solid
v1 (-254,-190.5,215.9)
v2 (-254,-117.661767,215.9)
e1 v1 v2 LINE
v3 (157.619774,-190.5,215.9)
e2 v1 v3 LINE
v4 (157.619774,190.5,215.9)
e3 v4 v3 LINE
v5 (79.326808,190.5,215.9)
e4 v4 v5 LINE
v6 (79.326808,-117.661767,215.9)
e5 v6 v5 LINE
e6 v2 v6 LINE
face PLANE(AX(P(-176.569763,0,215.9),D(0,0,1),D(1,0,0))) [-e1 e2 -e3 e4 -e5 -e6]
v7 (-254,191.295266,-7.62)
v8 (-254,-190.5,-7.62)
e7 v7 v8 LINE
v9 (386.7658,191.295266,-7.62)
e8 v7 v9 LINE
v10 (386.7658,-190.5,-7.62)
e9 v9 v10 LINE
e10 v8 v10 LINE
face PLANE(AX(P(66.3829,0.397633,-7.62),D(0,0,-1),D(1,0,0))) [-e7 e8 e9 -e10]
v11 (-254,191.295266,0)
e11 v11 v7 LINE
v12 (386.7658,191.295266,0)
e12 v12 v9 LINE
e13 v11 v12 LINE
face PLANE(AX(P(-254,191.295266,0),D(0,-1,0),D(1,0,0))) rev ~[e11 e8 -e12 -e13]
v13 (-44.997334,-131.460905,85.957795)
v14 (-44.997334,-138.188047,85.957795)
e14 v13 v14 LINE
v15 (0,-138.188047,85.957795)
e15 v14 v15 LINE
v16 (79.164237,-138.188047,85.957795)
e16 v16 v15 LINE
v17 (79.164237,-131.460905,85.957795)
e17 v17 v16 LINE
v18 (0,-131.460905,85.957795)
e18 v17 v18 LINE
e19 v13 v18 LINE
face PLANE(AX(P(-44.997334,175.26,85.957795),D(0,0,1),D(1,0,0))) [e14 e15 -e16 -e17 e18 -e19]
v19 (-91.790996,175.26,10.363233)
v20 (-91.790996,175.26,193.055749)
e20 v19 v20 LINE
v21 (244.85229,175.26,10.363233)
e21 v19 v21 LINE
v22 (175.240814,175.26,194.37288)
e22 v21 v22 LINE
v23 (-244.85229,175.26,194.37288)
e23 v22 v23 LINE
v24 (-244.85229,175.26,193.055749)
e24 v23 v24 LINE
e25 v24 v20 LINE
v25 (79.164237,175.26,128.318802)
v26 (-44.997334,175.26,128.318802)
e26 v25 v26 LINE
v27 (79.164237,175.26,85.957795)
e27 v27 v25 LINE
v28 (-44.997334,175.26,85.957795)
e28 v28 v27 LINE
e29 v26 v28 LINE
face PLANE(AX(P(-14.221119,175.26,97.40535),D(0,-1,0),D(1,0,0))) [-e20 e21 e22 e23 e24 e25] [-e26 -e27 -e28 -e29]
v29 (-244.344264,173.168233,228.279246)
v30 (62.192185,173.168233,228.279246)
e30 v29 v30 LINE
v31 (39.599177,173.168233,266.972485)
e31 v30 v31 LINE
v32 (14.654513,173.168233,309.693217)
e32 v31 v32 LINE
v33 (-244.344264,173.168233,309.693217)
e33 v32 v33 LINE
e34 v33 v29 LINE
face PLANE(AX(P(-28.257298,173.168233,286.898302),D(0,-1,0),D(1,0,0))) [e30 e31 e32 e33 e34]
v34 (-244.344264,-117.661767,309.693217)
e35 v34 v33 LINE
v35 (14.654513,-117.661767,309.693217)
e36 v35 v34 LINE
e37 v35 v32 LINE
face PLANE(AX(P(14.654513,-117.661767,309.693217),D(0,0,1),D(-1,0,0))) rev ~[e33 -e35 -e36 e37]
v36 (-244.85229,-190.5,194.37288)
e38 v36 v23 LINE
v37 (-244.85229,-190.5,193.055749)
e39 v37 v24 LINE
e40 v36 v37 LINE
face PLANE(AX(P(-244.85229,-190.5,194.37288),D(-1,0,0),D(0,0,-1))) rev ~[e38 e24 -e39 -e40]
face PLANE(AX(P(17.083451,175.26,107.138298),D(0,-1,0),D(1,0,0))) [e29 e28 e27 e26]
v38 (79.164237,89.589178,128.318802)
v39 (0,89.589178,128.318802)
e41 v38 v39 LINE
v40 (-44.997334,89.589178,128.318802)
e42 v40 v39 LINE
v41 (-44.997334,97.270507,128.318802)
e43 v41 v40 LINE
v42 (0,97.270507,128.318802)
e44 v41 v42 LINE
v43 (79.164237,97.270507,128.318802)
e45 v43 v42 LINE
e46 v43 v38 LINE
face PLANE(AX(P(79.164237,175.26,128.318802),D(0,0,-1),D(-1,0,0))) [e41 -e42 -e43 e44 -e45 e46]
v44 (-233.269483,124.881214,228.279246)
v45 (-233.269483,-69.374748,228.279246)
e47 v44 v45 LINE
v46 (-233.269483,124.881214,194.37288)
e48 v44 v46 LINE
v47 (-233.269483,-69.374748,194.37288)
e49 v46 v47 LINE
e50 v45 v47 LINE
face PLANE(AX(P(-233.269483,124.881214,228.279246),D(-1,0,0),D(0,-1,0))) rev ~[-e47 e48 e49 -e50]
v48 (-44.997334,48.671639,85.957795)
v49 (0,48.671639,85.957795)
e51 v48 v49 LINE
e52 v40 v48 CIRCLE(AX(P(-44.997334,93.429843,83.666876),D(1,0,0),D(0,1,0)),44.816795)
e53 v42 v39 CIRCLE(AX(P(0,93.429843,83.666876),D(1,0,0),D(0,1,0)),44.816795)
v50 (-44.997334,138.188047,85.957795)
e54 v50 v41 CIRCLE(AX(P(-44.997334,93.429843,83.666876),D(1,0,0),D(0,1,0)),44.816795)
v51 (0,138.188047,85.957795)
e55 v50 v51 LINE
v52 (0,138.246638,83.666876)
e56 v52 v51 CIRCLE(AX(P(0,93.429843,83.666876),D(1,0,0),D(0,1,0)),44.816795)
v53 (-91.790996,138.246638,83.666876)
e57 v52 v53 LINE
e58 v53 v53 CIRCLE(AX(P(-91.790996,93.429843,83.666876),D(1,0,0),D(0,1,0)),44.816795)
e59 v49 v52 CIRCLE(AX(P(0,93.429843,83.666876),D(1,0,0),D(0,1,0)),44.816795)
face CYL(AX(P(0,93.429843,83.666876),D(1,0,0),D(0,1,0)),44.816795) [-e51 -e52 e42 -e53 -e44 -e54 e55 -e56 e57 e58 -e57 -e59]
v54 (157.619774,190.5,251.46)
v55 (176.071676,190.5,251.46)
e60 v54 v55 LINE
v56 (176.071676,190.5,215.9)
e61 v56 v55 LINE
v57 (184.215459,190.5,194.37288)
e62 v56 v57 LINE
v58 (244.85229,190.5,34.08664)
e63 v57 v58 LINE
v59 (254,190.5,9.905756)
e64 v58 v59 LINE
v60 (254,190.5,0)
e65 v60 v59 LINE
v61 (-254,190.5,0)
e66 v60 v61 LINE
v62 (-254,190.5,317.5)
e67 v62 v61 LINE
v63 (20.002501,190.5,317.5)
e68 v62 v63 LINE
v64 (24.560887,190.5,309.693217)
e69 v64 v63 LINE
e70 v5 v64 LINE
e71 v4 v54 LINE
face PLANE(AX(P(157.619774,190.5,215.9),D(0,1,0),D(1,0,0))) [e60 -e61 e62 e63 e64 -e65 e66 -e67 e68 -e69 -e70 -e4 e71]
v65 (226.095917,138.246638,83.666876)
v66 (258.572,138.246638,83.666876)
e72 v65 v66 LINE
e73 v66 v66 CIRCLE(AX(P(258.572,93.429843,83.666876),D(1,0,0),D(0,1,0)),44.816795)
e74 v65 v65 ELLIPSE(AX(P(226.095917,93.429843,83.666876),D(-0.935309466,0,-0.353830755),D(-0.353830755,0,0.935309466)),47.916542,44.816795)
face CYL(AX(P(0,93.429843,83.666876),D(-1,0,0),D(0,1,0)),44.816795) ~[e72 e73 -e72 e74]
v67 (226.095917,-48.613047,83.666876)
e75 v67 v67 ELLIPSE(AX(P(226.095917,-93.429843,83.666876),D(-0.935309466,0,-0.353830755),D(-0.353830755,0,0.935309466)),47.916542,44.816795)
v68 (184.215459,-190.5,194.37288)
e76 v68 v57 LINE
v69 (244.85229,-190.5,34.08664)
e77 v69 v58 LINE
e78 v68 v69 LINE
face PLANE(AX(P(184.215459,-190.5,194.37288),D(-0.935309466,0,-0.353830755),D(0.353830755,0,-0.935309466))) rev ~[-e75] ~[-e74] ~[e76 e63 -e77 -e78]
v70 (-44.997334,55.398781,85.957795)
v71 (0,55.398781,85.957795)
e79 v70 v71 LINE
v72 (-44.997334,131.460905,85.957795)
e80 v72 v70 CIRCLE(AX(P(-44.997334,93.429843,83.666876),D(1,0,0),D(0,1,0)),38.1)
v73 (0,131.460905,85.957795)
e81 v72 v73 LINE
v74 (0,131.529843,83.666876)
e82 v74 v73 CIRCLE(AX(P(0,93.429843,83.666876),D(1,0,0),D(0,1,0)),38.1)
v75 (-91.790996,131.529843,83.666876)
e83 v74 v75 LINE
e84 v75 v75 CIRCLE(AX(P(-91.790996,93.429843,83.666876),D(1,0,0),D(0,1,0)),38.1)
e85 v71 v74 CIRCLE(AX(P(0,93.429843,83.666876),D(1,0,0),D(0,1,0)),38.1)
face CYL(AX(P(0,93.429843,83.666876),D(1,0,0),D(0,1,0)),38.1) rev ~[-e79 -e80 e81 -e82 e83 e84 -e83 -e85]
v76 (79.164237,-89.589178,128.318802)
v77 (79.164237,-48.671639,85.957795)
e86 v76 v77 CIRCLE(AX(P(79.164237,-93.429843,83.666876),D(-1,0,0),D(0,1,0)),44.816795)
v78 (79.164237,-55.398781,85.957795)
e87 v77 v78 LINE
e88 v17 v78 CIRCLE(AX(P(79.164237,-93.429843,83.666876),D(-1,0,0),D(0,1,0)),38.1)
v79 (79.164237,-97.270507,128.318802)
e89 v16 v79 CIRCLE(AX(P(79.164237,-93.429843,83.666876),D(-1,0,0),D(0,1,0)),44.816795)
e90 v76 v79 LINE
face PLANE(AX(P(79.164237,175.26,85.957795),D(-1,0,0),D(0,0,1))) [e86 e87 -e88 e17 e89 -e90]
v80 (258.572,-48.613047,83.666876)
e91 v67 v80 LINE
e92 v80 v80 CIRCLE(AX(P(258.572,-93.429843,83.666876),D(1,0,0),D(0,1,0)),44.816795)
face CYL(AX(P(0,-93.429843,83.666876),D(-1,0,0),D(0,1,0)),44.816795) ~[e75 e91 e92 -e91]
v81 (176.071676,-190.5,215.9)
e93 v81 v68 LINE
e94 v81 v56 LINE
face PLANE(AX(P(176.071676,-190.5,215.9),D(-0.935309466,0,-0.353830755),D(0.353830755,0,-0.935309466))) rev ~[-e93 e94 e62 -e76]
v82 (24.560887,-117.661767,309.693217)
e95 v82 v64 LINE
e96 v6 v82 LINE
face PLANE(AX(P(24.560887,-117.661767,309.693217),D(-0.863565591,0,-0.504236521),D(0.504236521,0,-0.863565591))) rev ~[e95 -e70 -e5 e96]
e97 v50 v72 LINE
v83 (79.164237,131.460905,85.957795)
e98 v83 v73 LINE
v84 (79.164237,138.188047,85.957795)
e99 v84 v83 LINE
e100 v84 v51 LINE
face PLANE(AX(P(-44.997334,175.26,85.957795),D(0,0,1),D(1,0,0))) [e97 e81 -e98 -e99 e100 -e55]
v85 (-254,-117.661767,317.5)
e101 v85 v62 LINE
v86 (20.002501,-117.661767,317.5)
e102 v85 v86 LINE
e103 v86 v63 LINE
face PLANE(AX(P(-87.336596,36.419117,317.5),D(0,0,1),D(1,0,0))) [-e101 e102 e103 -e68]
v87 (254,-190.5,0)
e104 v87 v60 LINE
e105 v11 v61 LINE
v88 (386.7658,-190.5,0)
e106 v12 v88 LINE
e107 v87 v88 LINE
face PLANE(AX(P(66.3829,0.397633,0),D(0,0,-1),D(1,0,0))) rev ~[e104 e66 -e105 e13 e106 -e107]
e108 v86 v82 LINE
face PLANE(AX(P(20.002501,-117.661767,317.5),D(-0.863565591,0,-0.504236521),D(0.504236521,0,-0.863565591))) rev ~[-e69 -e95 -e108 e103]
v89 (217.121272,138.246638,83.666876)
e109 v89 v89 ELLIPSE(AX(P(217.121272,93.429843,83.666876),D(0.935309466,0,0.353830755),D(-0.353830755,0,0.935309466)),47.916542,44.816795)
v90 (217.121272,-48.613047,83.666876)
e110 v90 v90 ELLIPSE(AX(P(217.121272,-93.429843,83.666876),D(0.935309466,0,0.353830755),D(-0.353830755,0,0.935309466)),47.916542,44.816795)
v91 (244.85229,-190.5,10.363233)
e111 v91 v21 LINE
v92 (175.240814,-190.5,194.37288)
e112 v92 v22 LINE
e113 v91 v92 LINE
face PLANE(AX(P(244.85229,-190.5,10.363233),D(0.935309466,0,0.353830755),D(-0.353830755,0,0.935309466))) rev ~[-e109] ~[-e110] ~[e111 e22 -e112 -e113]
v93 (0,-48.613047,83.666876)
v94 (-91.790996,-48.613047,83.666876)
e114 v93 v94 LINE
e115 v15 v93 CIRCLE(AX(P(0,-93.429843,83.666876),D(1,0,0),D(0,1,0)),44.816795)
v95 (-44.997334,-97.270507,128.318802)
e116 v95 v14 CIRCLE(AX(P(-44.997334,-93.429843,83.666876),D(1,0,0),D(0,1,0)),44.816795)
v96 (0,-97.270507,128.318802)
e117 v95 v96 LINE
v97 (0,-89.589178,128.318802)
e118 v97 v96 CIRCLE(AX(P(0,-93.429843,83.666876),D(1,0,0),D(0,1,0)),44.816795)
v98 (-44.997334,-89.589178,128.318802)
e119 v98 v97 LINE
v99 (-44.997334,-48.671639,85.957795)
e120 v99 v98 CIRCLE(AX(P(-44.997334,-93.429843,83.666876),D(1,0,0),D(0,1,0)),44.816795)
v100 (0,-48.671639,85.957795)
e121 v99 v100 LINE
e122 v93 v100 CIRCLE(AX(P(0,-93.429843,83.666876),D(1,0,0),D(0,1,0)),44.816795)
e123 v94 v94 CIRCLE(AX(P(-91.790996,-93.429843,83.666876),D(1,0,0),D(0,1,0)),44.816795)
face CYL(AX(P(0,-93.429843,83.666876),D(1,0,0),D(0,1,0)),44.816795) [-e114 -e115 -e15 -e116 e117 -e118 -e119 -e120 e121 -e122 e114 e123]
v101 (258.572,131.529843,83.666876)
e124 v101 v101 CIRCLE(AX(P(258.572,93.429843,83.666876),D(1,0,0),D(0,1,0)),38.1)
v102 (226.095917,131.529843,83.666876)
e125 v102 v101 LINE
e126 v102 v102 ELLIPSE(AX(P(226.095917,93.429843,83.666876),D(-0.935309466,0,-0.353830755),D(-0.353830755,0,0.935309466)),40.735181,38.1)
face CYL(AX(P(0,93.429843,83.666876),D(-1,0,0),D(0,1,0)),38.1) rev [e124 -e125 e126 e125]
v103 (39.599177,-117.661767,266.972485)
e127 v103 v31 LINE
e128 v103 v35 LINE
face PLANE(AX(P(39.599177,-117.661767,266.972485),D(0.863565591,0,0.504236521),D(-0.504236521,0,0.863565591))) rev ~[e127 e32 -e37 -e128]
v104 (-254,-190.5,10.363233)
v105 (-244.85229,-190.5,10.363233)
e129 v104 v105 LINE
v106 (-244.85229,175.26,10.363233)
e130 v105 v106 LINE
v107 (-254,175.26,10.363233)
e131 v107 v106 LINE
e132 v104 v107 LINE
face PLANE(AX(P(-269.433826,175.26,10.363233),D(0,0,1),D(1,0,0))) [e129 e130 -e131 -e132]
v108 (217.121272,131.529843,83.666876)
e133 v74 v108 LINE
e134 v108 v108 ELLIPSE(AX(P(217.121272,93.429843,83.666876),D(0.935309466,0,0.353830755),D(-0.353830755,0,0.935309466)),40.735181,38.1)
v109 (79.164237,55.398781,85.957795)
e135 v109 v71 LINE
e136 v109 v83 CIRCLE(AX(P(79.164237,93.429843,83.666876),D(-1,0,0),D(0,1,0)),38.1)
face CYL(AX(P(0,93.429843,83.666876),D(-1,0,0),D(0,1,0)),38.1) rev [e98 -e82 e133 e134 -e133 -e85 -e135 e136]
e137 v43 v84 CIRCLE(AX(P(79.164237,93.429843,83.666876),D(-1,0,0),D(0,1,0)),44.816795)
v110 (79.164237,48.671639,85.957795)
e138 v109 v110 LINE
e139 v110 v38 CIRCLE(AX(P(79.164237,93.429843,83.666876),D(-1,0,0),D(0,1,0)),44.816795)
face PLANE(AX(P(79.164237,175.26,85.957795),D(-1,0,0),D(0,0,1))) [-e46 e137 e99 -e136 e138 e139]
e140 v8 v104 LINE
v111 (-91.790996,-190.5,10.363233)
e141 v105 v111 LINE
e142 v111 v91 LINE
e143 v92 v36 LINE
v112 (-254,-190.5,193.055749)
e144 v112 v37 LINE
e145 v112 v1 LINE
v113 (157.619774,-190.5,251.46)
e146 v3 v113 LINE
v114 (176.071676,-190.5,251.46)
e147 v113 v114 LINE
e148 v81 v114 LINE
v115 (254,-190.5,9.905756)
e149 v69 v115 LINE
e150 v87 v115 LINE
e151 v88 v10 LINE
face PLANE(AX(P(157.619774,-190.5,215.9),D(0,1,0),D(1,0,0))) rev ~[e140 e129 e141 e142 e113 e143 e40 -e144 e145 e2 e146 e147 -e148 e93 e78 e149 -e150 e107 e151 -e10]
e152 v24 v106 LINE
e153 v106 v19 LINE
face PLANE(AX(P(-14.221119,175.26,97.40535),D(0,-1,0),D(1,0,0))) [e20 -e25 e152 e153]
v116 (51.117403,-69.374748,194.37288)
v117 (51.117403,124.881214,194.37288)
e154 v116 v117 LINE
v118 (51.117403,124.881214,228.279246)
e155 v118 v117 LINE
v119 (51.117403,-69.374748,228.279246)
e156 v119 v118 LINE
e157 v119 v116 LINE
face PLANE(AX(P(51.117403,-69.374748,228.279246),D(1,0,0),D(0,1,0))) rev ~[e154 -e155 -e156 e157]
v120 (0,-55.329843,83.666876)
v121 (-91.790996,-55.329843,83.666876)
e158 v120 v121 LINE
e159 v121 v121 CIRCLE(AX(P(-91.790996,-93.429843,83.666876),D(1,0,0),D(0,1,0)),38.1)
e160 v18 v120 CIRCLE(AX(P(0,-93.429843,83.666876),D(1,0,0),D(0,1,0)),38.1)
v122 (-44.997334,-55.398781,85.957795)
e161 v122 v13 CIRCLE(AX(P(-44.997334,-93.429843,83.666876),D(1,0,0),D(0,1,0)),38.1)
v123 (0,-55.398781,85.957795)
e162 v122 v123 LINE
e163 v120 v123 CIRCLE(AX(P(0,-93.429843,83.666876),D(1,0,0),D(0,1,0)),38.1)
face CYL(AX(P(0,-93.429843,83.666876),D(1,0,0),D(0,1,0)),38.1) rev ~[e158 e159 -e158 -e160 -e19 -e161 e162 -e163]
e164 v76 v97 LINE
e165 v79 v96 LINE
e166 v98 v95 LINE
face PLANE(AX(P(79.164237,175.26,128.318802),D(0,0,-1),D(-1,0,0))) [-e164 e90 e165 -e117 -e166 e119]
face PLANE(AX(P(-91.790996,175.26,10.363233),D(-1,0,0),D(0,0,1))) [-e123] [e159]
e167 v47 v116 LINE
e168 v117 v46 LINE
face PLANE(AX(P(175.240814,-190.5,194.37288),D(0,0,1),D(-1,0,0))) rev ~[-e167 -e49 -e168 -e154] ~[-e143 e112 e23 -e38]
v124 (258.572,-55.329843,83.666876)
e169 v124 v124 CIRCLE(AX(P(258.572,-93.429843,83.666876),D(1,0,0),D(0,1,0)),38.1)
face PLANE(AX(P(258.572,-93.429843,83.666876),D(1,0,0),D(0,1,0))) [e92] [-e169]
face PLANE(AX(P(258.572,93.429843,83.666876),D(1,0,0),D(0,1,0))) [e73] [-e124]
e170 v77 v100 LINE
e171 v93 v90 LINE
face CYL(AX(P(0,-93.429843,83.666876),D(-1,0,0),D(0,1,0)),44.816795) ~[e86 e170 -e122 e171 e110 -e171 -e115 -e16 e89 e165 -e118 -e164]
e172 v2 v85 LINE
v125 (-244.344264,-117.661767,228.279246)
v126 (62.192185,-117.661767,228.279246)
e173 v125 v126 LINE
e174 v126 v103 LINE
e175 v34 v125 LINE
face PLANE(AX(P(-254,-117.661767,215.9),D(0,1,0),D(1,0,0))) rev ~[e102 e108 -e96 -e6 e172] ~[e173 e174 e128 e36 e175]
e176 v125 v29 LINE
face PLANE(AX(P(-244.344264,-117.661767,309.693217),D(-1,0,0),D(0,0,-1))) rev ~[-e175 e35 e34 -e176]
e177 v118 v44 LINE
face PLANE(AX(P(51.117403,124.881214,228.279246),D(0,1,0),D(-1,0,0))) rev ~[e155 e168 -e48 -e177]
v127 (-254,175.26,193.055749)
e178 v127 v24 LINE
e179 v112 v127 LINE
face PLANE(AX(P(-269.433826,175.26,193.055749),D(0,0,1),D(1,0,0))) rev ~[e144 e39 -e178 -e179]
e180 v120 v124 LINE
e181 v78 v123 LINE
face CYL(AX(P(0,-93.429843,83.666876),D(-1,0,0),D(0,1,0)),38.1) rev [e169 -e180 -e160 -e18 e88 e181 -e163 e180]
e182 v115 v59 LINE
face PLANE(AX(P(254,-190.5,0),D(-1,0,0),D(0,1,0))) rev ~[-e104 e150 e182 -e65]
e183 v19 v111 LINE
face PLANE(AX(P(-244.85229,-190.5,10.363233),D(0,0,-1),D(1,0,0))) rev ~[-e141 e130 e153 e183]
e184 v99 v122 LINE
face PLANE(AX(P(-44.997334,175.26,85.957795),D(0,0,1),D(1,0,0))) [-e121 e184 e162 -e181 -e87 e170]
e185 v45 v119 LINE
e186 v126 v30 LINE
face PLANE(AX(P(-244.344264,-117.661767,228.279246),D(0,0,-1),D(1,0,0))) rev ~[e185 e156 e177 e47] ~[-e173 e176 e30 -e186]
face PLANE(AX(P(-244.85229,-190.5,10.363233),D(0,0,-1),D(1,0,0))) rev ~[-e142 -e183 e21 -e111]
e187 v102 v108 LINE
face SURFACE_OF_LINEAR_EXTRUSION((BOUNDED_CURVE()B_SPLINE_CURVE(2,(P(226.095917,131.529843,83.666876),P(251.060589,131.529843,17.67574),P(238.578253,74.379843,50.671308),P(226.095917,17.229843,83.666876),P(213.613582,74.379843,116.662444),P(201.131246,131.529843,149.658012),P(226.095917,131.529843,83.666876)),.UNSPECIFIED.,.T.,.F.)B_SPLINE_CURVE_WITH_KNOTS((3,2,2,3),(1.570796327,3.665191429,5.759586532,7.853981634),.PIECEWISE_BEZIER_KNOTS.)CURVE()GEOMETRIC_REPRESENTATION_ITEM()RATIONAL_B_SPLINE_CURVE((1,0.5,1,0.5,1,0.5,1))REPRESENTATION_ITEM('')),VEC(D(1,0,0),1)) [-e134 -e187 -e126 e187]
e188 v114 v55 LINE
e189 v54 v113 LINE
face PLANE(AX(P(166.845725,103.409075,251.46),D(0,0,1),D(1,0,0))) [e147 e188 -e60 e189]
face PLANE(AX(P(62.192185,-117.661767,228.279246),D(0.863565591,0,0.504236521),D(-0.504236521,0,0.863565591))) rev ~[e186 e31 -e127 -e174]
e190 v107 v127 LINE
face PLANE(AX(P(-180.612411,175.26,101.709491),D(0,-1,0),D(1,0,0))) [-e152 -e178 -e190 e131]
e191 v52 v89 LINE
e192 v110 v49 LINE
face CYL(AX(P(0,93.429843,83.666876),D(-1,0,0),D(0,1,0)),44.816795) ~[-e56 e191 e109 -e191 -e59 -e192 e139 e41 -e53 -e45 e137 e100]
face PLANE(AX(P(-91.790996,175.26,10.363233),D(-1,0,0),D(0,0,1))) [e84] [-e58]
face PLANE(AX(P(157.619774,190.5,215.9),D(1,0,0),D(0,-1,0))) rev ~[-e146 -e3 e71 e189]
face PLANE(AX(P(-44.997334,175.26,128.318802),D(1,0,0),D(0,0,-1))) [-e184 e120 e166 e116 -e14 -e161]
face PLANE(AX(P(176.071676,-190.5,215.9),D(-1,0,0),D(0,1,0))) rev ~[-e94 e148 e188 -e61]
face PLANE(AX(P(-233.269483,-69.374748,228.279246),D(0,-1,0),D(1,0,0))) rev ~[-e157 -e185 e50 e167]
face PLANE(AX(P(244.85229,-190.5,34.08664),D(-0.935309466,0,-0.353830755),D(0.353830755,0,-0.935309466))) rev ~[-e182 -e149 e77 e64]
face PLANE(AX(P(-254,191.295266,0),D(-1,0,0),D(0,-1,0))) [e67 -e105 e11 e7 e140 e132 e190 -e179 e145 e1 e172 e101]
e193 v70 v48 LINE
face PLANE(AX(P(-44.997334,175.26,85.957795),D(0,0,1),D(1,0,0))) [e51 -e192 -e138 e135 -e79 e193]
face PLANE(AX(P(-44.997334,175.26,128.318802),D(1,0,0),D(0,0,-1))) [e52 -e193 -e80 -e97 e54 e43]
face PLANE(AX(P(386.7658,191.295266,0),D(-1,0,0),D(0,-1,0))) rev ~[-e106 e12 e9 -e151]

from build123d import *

# Parameters (mm, degrees)
F0_W      = 154.8604735136
F0_H      = 381
F0_W_2    = 202.8337074444
F0_W_3    = 150.305819042
F1_DEPTH  = 215.9
F3_DEPTH  = 365.76
F4_DEPTH  = 474.472
F5_DEPTH  = 384.81
F6_DEPTH  = 463.296
F7_DEPTH  = 453.644
F8_DEPTH  = 401.828
F9_W      = 333.3268084526
F9_H      = 308.1617667079
F10_DEPTH = 101.6
F12_DEPTH = 332.74
F13_DEPTH = 290.83
F14_W     = 640.7658
F14_H     = 381.7952661514
F15_DEPTH = 7.62
F16_W     = 18.4519021228
F16_H     = 174.1818501353
F16_H_2   = 32.6362997293
F17_DEPTH = 35.56
F18_R     = 44.8167953051
F18_R_2   = 38.1
F19_DEPTH = 258.572
F20_DEPTH = 485.14
F21_DEPTH = 258.572
F22_DEPTH = 57.658
F23_DEPTH = 72.898
F24_DEPTH = 250.19
F25_W     = 142.1934430047
F25_H     = 97.1279808664
F26_DEPTH = 68.58
F28_DEPTH = 340.868
F30_W     = 177.6428297162
F30_H     = 182.6925156638
F31_DEPTH = 723.9


# Not quite as in the source:
# - the program builds the solid bodies; features that only make, move or delete a surface that nothing else refers to are left out


with BuildPart() as f1:
    # F0 (on Top) → F1 (new body)
    with BuildSketch(Plane.XY):
        with Locations((-176.5697632432, 0)):
            Rectangle(F0_W, F0_H)
        with Locations((2.2773272358, 0)):
            Rectangle(F0_W_2, F0_H)
        with Locations((178.847090479, 0)):
            Rectangle(F0_W_3, F0_H)
    extrude(amount=F1_DEPTH)

    # F2 (on face) → F3 (cut)
    with BuildSketch(Plane.XZ.offset(190.5)):
        Polygon((-244.8522895575, 194.3728802726), (-244.8522895575, 10.3632332757), (244.8522895575, 10.3632332757), (175.2408137327, 194.3728802726), align=None)
    extrude(amount=-F3_DEPTH, mode=Mode.SUBTRACT)

    # F2 (on face) → F4 (cut)
    with BuildSketch(Plane.XZ.offset(190.5)):
        Polygon((215.0387168483, 194.3728802726), (244.8522895575, 115.5642510209), (244.8522895575, 194.3728802726), align=None)
    extrude(amount=-F4_DEPTH, mode=Mode.SUBTRACT)

    # F2 (on face) → F5 (cut)
    with BuildSketch(Plane.XZ.offset(190.5)):
        Polygon((244.8522895575, 194.3728802726), (244.8522895575, 115.5642510209), (254, 91.3833677769), (254, 215.9), (206.8949341774, 215.9), (215.0387168483, 194.3728802726), align=None)
    extrude(amount=-F5_DEPTH, mode=Mode.SUBTRACT)

    # F2 (on face) → F6 (cut)
    with BuildSketch(Plane.XZ.offset(190.5)):
        Polygon((184.2154591353, 194.3728802726), (244.8522895575, 34.0866396952), (244.8522895575, 115.5642510209), (215.0387168483, 194.3728802726), align=None)
    extrude(amount=-F6_DEPTH, mode=Mode.SUBTRACT)

    # F2 (on face) → F7 (cut)
    with BuildSketch(Plane.XZ.offset(190.5)):
        Polygon((244.8522895575, 115.5642510209), (244.8522895575, 34.0866396952), (254, 9.9057564512), (254, 91.3833677769), align=None)
    extrude(amount=-F7_DEPTH, mode=Mode.SUBTRACT)

    # F2 (on face) → F8 (cut)
    with BuildSketch(Plane.XZ.offset(190.5)):
        Polygon((176.0716764644, 215.9), (184.2154591353, 194.3728802726), (215.0387168483, 194.3728802726), (206.8949341774, 215.9), align=None)
    extrude(amount=-F8_DEPTH, mode=Mode.SUBTRACT)

    # F9 (on face) → F10 (join)
    with BuildSketch(Plane.XY.offset(215.9)):
        with Locations((-87.3365957737, 36.4191166461)):
            Rectangle(F9_W, F9_H)
    extrude(amount=F10_DEPTH)

    # F11 (on face) → F12 (cut)
    with BuildSketch(Plane.XZ.offset(117.6617667079)):
        Polygon((62.1921845761, 266.8175234586), (79.3268084526, 266.7), (79.3268084526, 317.5), (20.0025010854, 317.5), (24.5608866934, 309.6932172775), (62.1921845761, 309.6932172775), align=None)
        Polygon((62.1921845761, 245.2451009057), (79.3268084526, 215.9), (79.3268084526, 266.7), (62.1921845761, 266.8175234586), align=None)
        Polygon((24.5608866934, 309.6932172775), (49.5453838887, 266.9042657045), (62.1921845761, 266.8175234586), (62.1921845761, 309.6932172775), align=None)
        Polygon((49.5453838887, 266.9042657045), (62.1921845761, 245.2451009057), (62.1921845761, 266.8175234586), align=None)
    extrude(amount=-F12_DEPTH, mode=Mode.SUBTRACT)

    # F11 (on face) → F13 (cut)
    with BuildSketch(Plane.XZ.offset(117.6617667079)):
        Polygon((-87.3365957737, 267.843115824), (39.5991766547, 266.9724850411), (14.6545127754, 309.6932172775), (-87.3365957737, 309.6932172775), align=None)
        Polygon((-244.3442642689, 268.9200046058), (-87.3365957737, 267.843115824), (-87.3365957737, 309.6932172775), (-244.3442642689, 309.6932172775), align=None)
        Polygon((-87.3365957737, 228.2792460185), (62.1921845761, 228.2792460185), (39.5991766547, 266.9724850411), (-87.3365957737, 267.843115824), align=None)
        Polygon((-244.3442642689, 228.2792460185), (-87.3365957737, 228.2792460185), (-87.3365957737, 267.843115824), (-244.3442642689, 268.9200046058), align=None)
    extrude(amount=-F13_DEPTH, mode=Mode.SUBTRACT)

    # F14 (on face) → F15 (join)
    with BuildSketch(Plane(origin=(0, 0, 0), x_dir=(1, 0, 0), z_dir=(0, 0, -1))):
        with Locations((66.3829, -0.3976330757)):
            Rectangle(F14_W, F14_H)
    extrude(amount=F15_DEPTH)

    # F16 (on face) → F17 (join)
    with BuildSketch(Plane.XY.offset(215.9)):
        with Locations((166.845725403, 103.4090749323)):
            Rectangle(F16_W, F16_H)
        with Locations((166.845725403, 0)):
            Rectangle(F16_W, F16_H_2)
        with Locations((166.845725403, -103.4090749323)):
            Rectangle(F16_W, F16_H)
    extrude(amount=F17_DEPTH)

    # F18 (on Right) → F19 (join)
    with BuildSketch(Plane.YZ):
        with Locations((-93.4298427632, 83.6668761742)):
            Circle(F18_R)
        with Locations((-93.4298427632, 83.6668761742)):
            Circle(F18_R_2, mode=Mode.SUBTRACT)
    extrude(amount=F19_DEPTH)

    # F18 (on Right) → F20 (cut)
    with BuildSketch(Plane.YZ):
        with Locations((-93.4298427632, 83.6668761742)):
            Circle(F18_R_2)
    extrude(amount=F20_DEPTH, mode=Mode.SUBTRACT)

    # F18 (on Right) → F21 (join)
    with BuildSketch(Plane.YZ):
        with Locations((93.4298427632, 83.6668761742)):
            Circle(F18_R)
        with Locations((93.4298427632, 83.6668761742)):
            Circle(F18_R_2, mode=Mode.SUBTRACT)
        with Locations((-93.4298427632, 83.6668761742)):
            Circle(F18_R)
        with Locations((-93.4298427632, 83.6668761742)):
            Circle(F18_R_2, mode=Mode.SUBTRACT)
    extrude(amount=F21_DEPTH)

    # F18 (on Right) → F22 (cut)
    with BuildSketch(Plane.YZ):
        with Locations((-93.4298427632, 83.6668761742)):
            Circle(F18_R)
        with Locations((-93.4298427632, 83.6668761742)):
            Circle(F18_R_2, mode=Mode.SUBTRACT)
        with Locations((93.4298427632, 83.6668761742)):
            Circle(F18_R)
        with Locations((93.4298427632, 83.6668761742)):
            Circle(F18_R_2, mode=Mode.SUBTRACT)
    extrude(amount=-F22_DEPTH, mode=Mode.SUBTRACT)

    # F18 (on Right) + F21_face (on face) → F23 (cut)
    with BuildSketch(Plane.YZ):
        with Locations((-93.4298427632, 83.6668761742)):
            Circle(F18_R)
        with Locations((-93.4298427632, 83.6668761742)):
            Circle(F18_R_2, mode=Mode.SUBTRACT)
        with Locations((93.4298427632, 83.6668761742)):
            Circle(F18_R)
        with Locations((93.4298427632, 83.6668761742)):
            Circle(F18_R_2, mode=Mode.SUBTRACT)
    with BuildSketch(Plane(origin=(226.0959173271, 93.4298427632, 83.6668761742), x_dir=(0, 1, 0), z_dir=(0.9353094659, 0, 0.3538307547))):
        with BuildLine():
            add(Edge.make_bspline(
                [(38.1, 0), (38.1, -70.5554024353), (-19.05, -35.2777012177), (-76.2, 0), (-19.05, 35.2777012177), (38.1, 70.5554024353), (38.1, 0)],
                knots=[1.5707963268, 1.5707963268, 1.5707963268, 3.6651914292, 3.6651914292, 5.7595865316, 5.7595865316, 7.853981634, 7.853981634, 7.853981634], degree=2, weights=[1, 0.5, 1, 0.5, 1, 0.5, 1]))
        make_face()
    extrude(amount=-F23_DEPTH, dir=(1, 0, 0), mode=Mode.SUBTRACT)

    # F18 (on Right) → F24 (join)
    with BuildSketch(Plane.YZ):
        with Locations((-93.4298427632, 83.6668761742)):
            Circle(F18_R)
        with Locations((-93.4298427632, 83.6668761742)):
            Circle(F18_R_2, mode=Mode.SUBTRACT)
        with Locations((93.4298427632, 83.6668761742)):
            Circle(F18_R)
        with Locations((93.4298427632, 83.6668761742)):
            Circle(F18_R_2, mode=Mode.SUBTRACT)
    extrude(amount=-F24_DEPTH)

    # F25 (on face) → F26 (cut)
    with BuildSketch(Plane.XY.offset(228.2792460185)):
        with Locations((-162.1727613487, -20.8107571411)):
            Rectangle(F25_W, F25_H)
        with Locations((-19.979318344, -20.8107571411)):
            Rectangle(F25_W, F25_H)
        with Locations((-162.1727613487, 76.3172237253)):
            Rectangle(F25_W, F25_H)
        with Locations((-19.979318344, 76.3172237253)):
            Rectangle(F25_W, F25_H)
    extrude(amount=-F26_DEPTH, mode=Mode.SUBTRACT)

    # F27 (on face) → F28 (cut)
    with BuildSketch(Plane.XZ.offset(-175.26)):
        Polygon((-44.9973344803, 128.3188015223), (-44.9973344803, 85.9577953815), (79.164236784, 85.9577953815), (79.164236784, 121.7455416918), (79.164236784, 128.3188015223), align=None)
    extrude(amount=F28_DEPTH, mode=Mode.SUBTRACT)

    # F30 (on face) → F31 (cut)
    with BuildSketch(Plane.XZ.offset(-175.26)):
        with Locations((-180.61241135, 101.7094911076)):
            Rectangle(F30_W, F30_H)
    extrude(amount=F31_DEPTH, mode=Mode.SUBTRACT)


solid = f1.part
